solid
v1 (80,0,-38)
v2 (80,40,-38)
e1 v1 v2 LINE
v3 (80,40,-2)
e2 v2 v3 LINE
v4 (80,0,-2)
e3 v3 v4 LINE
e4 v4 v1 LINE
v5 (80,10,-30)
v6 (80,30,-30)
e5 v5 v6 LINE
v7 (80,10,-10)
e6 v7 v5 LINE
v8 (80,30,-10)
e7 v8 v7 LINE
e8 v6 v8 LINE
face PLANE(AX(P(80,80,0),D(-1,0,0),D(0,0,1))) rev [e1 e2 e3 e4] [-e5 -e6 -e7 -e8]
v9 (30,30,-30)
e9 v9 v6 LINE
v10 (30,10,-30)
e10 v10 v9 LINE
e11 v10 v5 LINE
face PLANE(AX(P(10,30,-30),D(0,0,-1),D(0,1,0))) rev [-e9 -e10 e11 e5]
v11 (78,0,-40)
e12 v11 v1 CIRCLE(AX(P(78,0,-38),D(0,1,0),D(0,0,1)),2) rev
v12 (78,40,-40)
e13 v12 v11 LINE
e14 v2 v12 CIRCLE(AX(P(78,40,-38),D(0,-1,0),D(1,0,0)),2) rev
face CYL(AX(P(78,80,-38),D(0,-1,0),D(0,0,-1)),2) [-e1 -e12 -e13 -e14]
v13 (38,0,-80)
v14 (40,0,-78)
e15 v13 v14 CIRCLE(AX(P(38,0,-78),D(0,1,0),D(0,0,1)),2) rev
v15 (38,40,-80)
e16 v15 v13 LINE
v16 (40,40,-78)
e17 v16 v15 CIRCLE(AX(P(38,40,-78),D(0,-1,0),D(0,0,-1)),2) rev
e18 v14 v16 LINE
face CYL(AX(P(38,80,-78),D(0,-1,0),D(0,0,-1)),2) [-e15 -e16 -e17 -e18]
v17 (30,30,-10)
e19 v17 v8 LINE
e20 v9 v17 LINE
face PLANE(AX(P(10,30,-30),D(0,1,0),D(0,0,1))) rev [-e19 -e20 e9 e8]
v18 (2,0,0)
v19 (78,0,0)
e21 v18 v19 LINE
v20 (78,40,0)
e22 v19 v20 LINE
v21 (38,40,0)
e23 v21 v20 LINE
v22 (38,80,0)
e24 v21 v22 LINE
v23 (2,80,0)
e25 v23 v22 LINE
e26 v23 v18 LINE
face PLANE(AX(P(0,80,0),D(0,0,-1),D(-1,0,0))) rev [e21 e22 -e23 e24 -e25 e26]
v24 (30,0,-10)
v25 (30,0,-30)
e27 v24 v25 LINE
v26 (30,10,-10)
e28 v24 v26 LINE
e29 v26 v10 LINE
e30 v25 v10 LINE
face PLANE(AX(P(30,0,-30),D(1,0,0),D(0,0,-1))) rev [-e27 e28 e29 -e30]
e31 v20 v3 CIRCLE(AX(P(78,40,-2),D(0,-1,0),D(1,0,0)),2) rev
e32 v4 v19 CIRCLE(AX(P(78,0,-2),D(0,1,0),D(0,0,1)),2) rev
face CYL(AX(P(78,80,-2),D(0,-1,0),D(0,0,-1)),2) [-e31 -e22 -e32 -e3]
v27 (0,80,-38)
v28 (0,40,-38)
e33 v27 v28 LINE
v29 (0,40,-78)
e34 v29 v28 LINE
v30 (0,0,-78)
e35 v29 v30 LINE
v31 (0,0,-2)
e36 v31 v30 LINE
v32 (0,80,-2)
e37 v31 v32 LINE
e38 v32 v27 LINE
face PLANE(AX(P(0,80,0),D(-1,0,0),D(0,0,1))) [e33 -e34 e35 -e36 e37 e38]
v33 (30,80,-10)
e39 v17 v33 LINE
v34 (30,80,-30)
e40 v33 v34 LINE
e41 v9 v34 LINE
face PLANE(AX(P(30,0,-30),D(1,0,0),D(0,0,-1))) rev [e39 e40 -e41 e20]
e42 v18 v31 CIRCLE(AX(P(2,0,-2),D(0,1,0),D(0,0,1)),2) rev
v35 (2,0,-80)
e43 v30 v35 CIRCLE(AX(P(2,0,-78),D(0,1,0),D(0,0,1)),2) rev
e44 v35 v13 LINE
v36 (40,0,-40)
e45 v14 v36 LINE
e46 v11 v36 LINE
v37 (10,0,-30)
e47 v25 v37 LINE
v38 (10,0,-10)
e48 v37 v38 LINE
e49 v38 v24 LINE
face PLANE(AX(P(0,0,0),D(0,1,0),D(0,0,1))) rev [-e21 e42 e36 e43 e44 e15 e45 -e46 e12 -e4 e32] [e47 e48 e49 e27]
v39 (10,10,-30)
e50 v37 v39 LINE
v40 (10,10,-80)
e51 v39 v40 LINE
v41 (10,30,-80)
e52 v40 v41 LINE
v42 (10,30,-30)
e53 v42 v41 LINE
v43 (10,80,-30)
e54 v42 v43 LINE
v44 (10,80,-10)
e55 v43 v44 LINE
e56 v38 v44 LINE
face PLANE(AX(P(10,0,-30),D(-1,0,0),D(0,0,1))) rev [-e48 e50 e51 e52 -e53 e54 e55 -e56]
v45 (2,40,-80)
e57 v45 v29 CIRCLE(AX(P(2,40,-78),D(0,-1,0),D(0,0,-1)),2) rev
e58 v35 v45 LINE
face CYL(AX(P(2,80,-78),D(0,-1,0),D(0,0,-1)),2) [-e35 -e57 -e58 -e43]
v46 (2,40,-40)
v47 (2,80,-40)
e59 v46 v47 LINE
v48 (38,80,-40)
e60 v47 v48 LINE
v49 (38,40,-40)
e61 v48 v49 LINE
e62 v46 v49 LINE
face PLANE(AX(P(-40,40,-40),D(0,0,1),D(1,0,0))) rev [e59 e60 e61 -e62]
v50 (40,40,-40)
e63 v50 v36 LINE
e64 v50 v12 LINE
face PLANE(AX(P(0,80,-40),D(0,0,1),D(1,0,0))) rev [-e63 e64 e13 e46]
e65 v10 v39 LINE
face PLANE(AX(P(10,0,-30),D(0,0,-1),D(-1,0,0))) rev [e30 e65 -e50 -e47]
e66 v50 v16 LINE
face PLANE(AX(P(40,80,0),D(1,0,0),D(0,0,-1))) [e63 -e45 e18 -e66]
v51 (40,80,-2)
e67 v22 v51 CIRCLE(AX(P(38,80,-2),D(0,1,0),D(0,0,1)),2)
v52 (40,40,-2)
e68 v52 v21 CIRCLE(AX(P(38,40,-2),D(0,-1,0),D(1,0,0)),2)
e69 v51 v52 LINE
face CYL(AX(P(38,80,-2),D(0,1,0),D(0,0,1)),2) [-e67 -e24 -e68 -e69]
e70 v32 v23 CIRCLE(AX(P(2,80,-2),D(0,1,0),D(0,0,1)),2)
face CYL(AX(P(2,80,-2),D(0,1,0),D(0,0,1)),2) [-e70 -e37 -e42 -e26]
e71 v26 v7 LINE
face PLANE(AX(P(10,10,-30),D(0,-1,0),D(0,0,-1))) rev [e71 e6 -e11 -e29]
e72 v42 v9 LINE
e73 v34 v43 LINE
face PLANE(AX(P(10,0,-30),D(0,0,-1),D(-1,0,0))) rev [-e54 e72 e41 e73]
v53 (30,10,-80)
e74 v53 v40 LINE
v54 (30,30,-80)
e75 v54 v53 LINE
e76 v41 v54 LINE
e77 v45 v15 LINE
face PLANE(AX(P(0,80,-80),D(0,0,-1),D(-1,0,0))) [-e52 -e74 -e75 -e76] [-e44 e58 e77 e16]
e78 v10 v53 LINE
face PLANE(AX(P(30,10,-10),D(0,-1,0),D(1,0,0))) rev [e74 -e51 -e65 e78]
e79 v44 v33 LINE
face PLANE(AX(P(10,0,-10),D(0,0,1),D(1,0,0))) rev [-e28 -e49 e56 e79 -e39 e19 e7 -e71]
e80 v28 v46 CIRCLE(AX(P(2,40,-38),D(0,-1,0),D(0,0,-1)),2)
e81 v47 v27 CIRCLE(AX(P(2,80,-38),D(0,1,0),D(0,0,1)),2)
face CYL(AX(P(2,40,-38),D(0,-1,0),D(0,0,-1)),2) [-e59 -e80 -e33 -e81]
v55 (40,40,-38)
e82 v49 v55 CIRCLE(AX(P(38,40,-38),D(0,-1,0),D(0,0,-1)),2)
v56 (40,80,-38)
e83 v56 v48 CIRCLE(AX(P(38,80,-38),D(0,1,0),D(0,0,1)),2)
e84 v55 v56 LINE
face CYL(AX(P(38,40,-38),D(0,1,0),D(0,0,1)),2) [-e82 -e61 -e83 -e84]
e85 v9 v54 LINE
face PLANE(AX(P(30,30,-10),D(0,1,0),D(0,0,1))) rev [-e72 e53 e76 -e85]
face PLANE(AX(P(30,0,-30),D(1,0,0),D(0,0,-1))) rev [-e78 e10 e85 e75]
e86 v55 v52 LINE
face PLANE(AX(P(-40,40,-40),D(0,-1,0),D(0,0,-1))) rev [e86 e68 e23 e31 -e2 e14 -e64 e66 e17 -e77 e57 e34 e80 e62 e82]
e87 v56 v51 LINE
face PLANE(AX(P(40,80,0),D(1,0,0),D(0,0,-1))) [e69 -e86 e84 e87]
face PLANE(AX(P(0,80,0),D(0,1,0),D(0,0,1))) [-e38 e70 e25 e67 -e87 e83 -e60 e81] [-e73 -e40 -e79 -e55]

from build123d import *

# Parameters (mm, degrees)
SALIENTE_EXTRUIR1_DEPTH = 80
CROQUIS2_W              = 40
CROQUIS2_H              = 40
CORTAR_EXTRUIR1_DEPTH   = 80
CROQUIS3_W              = 40
CROQUIS3_H              = 40
CORTAR_EXTRUIR2_DEPTH   = 80
REDONDEO1_R             = 2
CROQUIS4_W              = 20
CROQUIS4_H              = 20
CORTAR_EXTRUIR3_DEPTH   = 80
CROQUIS5_W              = 20
CROQUIS5_H              = 20
CORTAR_EXTRUIR4_DEPTH   = 50
CROQUIS6_W              = 20
CROQUIS6_H              = 20
CORTAR_EXTRUIR5_DEPTH   = 50


with BuildPart() as part:
    # Croquis1 → Saliente-Extruir1 (new body)
    with BuildSketch(Plane(origin=(0, 0, 0), x_dir=(1, 0, 0), z_dir=(0, 1, 0))):
        Polygon((0, 80), (0, 0), (80, 0), (80, 40), (40, 40), (40, 80), align=None)
    extrude(amount=SALIENTE_EXTRUIR1_DEPTH)

    # Croquis2 → Cortar-Extruir1 (cut)
    with BuildSketch(Plane.XY):
        with Locations((60, 60)):
            Rectangle(CROQUIS2_W, CROQUIS2_H)
    extrude(amount=-CORTAR_EXTRUIR1_DEPTH, mode=Mode.SUBTRACT)

    # Croquis3 → Cortar-Extruir2 (cut)
    with BuildSketch(Plane(origin=(40, 0, 0), x_dir=(0, 0, -1), z_dir=(1, 0, 0))):
        with Locations((60, 60)):
            Rectangle(CROQUIS3_W, CROQUIS3_H)
    extrude(amount=-CORTAR_EXTRUIR2_DEPTH, mode=Mode.SUBTRACT)

    # Redondeo1
    # the kernel refuses this fillet: 2 mm, written as the material it takes off along each edge
    with BuildSketch(Plane(origin=(0, -5, 0), x_dir=(0, 0, -1), z_dir=(0, 1, 0))) as redondeo1_piece_1:
        with BuildLine():
            CenterArc((REDONDEO1_R, -REDONDEO1_R), REDONDEO1_R, 90, 90)
            Line((0, -REDONDEO1_R), (0, 0))
            Line((0, 0), (REDONDEO1_R, 0))
        make_face()
    extrude(amount=90, mode=Mode.SUBTRACT)
    with BuildSketch(Plane(origin=(80, -5, -40), x_dir=(0, 0, 1), z_dir=(0, 1, 0)), Plane(origin=(80, -5, 0), x_dir=(-1, 0, 0), z_dir=(0, 1, 0)), Plane(origin=(40, 45, -80), x_dir=(-1, 0, 0), z_dir=(0, -1, 0))) as redondeo1_piece_2:
        with BuildLine():
            CenterArc((REDONDEO1_R, -REDONDEO1_R), REDONDEO1_R, 90, 90)
            Line((0, -REDONDEO1_R), (0, 0))
            Line((0, 0), (REDONDEO1_R, 0))
        make_face()
    extrude(amount=50, mode=Mode.SUBTRACT)
    with BuildSketch(Plane(origin=(40, 85, 0), x_dir=(-1, 0, 0), z_dir=(0, -1, 0))) as redondeo1_piece_3:
        with BuildLine():
            CenterArc((REDONDEO1_R, REDONDEO1_R), REDONDEO1_R, 180, 90)
            Line((0, REDONDEO1_R), (0, 0))
            Line((0, 0), (REDONDEO1_R, 0))
        make_face()
    extrude(amount=45, mode=Mode.SUBTRACT)
    with BuildSketch(Plane(origin=(0, -5, -80), x_dir=(0, 0, 1), z_dir=(0, 1, 0))) as redondeo1_piece_4:
        with BuildLine():
            CenterArc((REDONDEO1_R, REDONDEO1_R), REDONDEO1_R, 180, 90)
            Line((0, REDONDEO1_R), (0, 0))
            Line((0, 0), (REDONDEO1_R, 0))
        make_face()
    extrude(amount=50, mode=Mode.SUBTRACT)
    with BuildSketch(Plane(origin=(0, 85, -40), x_dir=(0, 0, 1), z_dir=(0, -1, 0)), Plane(origin=(40, 85, -40), x_dir=(-1, 0, 0), z_dir=(0, -1, 0))) as redondeo1_piece_5:
        with BuildLine():
            CenterArc((REDONDEO1_R, -REDONDEO1_R), REDONDEO1_R, 90, 90)
            Line((0, -REDONDEO1_R), (0, 0))
            Line((0, 0), (REDONDEO1_R, 0))
        make_face()
    extrude(amount=45, mode=Mode.SUBTRACT)

    # Croquis4 → Cortar-Extruir3 (cut)
    with BuildSketch(Plane(origin=(0, 80, 0), x_dir=(1, 0, 0), z_dir=(0, 1, 0))):
        with Locations((20, 20)):
            Rectangle(CROQUIS4_W, CROQUIS4_H)
    extrude(amount=-CORTAR_EXTRUIR3_DEPTH, mode=Mode.SUBTRACT)

    # Croquis5 → Cortar-Extruir4 (cut)
    with BuildSketch(Plane(origin=(0, 0, -80), x_dir=(-1, 0, 0), z_dir=(0, 0, -1))):
        with Locations((-20, 20)):
            Rectangle(CROQUIS5_W, CROQUIS5_H)
    extrude(amount=-CORTAR_EXTRUIR4_DEPTH, mode=Mode.SUBTRACT)

    # Croquis6 → Cortar-Extruir5 (cut)
    with BuildSketch(Plane(origin=(80, 0, 0), x_dir=(0, 0, -1), z_dir=(1, 0, 0))):
        with Locations((20, 20)):
            Rectangle(CROQUIS6_W, CROQUIS6_H)
    extrude(amount=-CORTAR_EXTRUIR5_DEPTH, mode=Mode.SUBTRACT)


solid = part.part
